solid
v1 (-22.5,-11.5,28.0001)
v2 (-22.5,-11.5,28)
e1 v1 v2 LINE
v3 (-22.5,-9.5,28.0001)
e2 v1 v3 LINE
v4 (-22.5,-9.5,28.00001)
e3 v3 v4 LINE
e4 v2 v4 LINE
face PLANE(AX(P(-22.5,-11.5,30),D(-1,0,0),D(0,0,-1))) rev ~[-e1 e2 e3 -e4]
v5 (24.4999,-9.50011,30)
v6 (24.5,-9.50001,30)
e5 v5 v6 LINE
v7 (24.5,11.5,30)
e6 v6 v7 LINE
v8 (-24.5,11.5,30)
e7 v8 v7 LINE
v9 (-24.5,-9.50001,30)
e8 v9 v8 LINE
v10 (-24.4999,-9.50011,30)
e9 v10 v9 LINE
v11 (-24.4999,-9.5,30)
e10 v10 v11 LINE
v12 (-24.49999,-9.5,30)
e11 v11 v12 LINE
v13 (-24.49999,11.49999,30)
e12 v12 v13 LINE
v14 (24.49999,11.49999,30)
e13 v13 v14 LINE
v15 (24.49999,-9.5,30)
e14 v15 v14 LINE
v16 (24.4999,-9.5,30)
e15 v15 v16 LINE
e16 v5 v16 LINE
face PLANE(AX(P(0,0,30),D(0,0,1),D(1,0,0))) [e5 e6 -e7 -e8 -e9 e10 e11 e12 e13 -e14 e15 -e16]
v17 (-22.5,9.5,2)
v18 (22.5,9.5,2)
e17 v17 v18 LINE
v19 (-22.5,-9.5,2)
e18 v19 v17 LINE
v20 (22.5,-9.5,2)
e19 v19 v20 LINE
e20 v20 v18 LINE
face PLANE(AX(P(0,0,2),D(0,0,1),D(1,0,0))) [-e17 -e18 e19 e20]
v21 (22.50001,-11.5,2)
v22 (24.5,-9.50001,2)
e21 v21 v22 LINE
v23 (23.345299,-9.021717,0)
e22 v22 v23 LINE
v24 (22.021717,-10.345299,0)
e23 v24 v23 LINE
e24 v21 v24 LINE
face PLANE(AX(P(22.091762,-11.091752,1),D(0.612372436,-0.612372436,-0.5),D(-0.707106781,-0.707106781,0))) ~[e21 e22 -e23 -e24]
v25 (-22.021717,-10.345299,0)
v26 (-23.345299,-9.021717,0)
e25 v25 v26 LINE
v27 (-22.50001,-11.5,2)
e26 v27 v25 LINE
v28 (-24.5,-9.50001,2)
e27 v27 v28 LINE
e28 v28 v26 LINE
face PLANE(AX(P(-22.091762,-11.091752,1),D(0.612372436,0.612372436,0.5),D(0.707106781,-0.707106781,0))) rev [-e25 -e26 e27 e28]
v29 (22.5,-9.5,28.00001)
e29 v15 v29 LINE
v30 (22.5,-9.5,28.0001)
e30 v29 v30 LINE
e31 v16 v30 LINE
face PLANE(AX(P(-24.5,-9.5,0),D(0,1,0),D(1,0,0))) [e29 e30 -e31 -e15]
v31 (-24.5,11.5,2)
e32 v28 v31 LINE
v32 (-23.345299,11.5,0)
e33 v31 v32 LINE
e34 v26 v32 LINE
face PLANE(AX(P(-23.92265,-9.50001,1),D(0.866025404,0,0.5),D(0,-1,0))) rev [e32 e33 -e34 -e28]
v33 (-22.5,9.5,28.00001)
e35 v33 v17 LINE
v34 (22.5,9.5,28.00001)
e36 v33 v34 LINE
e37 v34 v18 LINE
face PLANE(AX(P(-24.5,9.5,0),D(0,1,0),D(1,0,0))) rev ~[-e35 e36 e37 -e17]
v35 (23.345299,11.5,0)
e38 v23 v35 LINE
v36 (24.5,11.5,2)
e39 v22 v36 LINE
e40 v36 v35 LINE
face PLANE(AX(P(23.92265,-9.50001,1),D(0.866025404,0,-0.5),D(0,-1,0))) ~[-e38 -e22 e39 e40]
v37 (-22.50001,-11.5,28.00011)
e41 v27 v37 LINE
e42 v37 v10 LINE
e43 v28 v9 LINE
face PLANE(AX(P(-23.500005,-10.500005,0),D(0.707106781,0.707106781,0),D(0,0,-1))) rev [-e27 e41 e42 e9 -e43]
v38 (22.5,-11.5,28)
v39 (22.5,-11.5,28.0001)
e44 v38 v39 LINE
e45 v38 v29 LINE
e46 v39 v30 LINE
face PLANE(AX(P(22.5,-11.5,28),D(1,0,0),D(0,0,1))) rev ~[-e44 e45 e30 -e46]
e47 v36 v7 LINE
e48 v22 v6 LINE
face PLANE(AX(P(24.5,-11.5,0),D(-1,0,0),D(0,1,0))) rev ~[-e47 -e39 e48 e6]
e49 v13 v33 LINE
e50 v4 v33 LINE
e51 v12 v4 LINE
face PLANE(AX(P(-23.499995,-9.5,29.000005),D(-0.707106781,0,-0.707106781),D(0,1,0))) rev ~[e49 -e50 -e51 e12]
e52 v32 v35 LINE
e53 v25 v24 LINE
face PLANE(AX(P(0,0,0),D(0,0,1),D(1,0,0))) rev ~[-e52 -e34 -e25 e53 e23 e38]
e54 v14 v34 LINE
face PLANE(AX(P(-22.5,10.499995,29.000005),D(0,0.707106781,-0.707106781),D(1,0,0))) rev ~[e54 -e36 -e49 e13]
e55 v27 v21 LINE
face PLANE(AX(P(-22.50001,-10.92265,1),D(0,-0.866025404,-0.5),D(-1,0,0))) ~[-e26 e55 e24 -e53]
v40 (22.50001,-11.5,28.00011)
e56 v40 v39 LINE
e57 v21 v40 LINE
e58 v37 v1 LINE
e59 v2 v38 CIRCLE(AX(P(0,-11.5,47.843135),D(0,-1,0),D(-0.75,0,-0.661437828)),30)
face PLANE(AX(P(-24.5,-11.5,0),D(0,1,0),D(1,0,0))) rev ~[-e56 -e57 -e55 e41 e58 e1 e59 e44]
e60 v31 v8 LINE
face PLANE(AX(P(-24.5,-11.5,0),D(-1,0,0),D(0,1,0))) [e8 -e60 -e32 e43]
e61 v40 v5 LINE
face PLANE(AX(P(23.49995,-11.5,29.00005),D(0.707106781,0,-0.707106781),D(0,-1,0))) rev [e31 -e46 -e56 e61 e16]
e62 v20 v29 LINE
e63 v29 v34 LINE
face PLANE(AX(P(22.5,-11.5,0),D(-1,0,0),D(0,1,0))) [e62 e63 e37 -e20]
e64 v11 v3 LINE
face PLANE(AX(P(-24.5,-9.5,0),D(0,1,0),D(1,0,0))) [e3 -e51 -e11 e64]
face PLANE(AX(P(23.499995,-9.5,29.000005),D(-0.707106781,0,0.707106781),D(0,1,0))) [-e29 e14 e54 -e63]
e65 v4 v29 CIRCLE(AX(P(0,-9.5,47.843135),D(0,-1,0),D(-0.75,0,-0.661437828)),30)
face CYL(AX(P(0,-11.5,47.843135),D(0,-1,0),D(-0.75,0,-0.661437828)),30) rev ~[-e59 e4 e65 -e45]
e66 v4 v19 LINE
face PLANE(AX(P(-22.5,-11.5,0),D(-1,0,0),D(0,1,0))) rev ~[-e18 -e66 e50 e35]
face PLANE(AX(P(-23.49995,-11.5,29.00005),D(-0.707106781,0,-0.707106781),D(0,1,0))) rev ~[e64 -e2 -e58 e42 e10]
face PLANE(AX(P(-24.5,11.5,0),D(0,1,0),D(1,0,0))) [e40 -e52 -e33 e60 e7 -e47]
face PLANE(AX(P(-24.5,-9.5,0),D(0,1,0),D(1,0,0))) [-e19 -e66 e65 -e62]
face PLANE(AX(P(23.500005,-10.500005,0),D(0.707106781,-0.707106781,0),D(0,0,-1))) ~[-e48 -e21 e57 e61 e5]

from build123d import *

# Parameters (mm, degrees)
F0_W     = 49
F0_H     = 23
F1_DEPTH = 30
F2_T     = -2
F3_SIZE  = 1.99999
F5_DEPTH = 2
F6_SIZE  = 1.9999
F7_SIZE  = 1.99999
F8_SIZE2 = 1.1547005384
F8_SIZE  = 2


# Not quite as in the source:
# - a fillet or chamfer is up to 0.001 mm smaller than in the source, because OpenCascade refuses the exact size


with BuildPart() as f1:
    # F0 (on Top) → F1 (new body)
    with BuildSketch(Plane.XY):
        Rectangle(F0_W, F0_H)
    extrude(amount=F1_DEPTH)

    # F2
    f2_openings = [f1.faces().sort_by_distance(p)[0] for p in [
        (0, 0, 30),
    ]]
    offset(amount=F2_T, openings=f2_openings)

    # F3 (size 2 in the source; OpenCascade refuses exactly that, so slightly less here)
    f3_edges = [f1.edges().sort_by_distance(p)[0] for p in [
        (0, 9.5, 30),
        (-22.5, 0, 30),
        (22.5, 0, 30),
    ]]
    chamfer(f3_edges, length=F3_SIZE)

    # F4 (on face) → F5 (cut, through all)
    with BuildSketch(Plane.XZ.offset(11.5)):
        with BuildLine():
            Line((-22.5, 30), (-22.5, 28))
            ThreePointArc((-22.5, 28), (0, 17.843134833), (22.5, 28))
            Line((22.5, 28), (22.5, 30))
            Line((22.5, 30), (-22.5, 30))
        make_face()
    extrude(amount=-F5_DEPTH, mode=Mode.SUBTRACT)

    # F6 (size 2 in the source; OpenCascade refuses exactly that, so slightly less here)
    f6_edges = [f1.edges().sort_by_distance(p)[0] for p in [
        (-22.5, -10.5, 30),
        (22.5, -10.5, 30),
    ]]
    chamfer(f6_edges, length=F6_SIZE)

    # F7 (size 2 in the source; OpenCascade refuses exactly that, so slightly less here)
    f7_edges = [f1.edges().sort_by_distance(p)[0] for p in [
        (-24.5, -11.5, 15),
        (24.5, -11.5, 15),
    ]]
    chamfer(f7_edges, length=F7_SIZE)

    # F8
    f8_edges = [f1.edges().sort_by_distance(p)[0] for p in [
        (24.5, 0.999995, 0),
        (23.500005, -10.500005, 0),
        (0, -11.5, 0),
        (-23.500005, -10.500005, 0),
        (-24.5, 0.999995, 0),
    ]]
    chamfer(f8_edges, length=F8_SIZE, length2=F8_SIZE2)


solid = f1.part
